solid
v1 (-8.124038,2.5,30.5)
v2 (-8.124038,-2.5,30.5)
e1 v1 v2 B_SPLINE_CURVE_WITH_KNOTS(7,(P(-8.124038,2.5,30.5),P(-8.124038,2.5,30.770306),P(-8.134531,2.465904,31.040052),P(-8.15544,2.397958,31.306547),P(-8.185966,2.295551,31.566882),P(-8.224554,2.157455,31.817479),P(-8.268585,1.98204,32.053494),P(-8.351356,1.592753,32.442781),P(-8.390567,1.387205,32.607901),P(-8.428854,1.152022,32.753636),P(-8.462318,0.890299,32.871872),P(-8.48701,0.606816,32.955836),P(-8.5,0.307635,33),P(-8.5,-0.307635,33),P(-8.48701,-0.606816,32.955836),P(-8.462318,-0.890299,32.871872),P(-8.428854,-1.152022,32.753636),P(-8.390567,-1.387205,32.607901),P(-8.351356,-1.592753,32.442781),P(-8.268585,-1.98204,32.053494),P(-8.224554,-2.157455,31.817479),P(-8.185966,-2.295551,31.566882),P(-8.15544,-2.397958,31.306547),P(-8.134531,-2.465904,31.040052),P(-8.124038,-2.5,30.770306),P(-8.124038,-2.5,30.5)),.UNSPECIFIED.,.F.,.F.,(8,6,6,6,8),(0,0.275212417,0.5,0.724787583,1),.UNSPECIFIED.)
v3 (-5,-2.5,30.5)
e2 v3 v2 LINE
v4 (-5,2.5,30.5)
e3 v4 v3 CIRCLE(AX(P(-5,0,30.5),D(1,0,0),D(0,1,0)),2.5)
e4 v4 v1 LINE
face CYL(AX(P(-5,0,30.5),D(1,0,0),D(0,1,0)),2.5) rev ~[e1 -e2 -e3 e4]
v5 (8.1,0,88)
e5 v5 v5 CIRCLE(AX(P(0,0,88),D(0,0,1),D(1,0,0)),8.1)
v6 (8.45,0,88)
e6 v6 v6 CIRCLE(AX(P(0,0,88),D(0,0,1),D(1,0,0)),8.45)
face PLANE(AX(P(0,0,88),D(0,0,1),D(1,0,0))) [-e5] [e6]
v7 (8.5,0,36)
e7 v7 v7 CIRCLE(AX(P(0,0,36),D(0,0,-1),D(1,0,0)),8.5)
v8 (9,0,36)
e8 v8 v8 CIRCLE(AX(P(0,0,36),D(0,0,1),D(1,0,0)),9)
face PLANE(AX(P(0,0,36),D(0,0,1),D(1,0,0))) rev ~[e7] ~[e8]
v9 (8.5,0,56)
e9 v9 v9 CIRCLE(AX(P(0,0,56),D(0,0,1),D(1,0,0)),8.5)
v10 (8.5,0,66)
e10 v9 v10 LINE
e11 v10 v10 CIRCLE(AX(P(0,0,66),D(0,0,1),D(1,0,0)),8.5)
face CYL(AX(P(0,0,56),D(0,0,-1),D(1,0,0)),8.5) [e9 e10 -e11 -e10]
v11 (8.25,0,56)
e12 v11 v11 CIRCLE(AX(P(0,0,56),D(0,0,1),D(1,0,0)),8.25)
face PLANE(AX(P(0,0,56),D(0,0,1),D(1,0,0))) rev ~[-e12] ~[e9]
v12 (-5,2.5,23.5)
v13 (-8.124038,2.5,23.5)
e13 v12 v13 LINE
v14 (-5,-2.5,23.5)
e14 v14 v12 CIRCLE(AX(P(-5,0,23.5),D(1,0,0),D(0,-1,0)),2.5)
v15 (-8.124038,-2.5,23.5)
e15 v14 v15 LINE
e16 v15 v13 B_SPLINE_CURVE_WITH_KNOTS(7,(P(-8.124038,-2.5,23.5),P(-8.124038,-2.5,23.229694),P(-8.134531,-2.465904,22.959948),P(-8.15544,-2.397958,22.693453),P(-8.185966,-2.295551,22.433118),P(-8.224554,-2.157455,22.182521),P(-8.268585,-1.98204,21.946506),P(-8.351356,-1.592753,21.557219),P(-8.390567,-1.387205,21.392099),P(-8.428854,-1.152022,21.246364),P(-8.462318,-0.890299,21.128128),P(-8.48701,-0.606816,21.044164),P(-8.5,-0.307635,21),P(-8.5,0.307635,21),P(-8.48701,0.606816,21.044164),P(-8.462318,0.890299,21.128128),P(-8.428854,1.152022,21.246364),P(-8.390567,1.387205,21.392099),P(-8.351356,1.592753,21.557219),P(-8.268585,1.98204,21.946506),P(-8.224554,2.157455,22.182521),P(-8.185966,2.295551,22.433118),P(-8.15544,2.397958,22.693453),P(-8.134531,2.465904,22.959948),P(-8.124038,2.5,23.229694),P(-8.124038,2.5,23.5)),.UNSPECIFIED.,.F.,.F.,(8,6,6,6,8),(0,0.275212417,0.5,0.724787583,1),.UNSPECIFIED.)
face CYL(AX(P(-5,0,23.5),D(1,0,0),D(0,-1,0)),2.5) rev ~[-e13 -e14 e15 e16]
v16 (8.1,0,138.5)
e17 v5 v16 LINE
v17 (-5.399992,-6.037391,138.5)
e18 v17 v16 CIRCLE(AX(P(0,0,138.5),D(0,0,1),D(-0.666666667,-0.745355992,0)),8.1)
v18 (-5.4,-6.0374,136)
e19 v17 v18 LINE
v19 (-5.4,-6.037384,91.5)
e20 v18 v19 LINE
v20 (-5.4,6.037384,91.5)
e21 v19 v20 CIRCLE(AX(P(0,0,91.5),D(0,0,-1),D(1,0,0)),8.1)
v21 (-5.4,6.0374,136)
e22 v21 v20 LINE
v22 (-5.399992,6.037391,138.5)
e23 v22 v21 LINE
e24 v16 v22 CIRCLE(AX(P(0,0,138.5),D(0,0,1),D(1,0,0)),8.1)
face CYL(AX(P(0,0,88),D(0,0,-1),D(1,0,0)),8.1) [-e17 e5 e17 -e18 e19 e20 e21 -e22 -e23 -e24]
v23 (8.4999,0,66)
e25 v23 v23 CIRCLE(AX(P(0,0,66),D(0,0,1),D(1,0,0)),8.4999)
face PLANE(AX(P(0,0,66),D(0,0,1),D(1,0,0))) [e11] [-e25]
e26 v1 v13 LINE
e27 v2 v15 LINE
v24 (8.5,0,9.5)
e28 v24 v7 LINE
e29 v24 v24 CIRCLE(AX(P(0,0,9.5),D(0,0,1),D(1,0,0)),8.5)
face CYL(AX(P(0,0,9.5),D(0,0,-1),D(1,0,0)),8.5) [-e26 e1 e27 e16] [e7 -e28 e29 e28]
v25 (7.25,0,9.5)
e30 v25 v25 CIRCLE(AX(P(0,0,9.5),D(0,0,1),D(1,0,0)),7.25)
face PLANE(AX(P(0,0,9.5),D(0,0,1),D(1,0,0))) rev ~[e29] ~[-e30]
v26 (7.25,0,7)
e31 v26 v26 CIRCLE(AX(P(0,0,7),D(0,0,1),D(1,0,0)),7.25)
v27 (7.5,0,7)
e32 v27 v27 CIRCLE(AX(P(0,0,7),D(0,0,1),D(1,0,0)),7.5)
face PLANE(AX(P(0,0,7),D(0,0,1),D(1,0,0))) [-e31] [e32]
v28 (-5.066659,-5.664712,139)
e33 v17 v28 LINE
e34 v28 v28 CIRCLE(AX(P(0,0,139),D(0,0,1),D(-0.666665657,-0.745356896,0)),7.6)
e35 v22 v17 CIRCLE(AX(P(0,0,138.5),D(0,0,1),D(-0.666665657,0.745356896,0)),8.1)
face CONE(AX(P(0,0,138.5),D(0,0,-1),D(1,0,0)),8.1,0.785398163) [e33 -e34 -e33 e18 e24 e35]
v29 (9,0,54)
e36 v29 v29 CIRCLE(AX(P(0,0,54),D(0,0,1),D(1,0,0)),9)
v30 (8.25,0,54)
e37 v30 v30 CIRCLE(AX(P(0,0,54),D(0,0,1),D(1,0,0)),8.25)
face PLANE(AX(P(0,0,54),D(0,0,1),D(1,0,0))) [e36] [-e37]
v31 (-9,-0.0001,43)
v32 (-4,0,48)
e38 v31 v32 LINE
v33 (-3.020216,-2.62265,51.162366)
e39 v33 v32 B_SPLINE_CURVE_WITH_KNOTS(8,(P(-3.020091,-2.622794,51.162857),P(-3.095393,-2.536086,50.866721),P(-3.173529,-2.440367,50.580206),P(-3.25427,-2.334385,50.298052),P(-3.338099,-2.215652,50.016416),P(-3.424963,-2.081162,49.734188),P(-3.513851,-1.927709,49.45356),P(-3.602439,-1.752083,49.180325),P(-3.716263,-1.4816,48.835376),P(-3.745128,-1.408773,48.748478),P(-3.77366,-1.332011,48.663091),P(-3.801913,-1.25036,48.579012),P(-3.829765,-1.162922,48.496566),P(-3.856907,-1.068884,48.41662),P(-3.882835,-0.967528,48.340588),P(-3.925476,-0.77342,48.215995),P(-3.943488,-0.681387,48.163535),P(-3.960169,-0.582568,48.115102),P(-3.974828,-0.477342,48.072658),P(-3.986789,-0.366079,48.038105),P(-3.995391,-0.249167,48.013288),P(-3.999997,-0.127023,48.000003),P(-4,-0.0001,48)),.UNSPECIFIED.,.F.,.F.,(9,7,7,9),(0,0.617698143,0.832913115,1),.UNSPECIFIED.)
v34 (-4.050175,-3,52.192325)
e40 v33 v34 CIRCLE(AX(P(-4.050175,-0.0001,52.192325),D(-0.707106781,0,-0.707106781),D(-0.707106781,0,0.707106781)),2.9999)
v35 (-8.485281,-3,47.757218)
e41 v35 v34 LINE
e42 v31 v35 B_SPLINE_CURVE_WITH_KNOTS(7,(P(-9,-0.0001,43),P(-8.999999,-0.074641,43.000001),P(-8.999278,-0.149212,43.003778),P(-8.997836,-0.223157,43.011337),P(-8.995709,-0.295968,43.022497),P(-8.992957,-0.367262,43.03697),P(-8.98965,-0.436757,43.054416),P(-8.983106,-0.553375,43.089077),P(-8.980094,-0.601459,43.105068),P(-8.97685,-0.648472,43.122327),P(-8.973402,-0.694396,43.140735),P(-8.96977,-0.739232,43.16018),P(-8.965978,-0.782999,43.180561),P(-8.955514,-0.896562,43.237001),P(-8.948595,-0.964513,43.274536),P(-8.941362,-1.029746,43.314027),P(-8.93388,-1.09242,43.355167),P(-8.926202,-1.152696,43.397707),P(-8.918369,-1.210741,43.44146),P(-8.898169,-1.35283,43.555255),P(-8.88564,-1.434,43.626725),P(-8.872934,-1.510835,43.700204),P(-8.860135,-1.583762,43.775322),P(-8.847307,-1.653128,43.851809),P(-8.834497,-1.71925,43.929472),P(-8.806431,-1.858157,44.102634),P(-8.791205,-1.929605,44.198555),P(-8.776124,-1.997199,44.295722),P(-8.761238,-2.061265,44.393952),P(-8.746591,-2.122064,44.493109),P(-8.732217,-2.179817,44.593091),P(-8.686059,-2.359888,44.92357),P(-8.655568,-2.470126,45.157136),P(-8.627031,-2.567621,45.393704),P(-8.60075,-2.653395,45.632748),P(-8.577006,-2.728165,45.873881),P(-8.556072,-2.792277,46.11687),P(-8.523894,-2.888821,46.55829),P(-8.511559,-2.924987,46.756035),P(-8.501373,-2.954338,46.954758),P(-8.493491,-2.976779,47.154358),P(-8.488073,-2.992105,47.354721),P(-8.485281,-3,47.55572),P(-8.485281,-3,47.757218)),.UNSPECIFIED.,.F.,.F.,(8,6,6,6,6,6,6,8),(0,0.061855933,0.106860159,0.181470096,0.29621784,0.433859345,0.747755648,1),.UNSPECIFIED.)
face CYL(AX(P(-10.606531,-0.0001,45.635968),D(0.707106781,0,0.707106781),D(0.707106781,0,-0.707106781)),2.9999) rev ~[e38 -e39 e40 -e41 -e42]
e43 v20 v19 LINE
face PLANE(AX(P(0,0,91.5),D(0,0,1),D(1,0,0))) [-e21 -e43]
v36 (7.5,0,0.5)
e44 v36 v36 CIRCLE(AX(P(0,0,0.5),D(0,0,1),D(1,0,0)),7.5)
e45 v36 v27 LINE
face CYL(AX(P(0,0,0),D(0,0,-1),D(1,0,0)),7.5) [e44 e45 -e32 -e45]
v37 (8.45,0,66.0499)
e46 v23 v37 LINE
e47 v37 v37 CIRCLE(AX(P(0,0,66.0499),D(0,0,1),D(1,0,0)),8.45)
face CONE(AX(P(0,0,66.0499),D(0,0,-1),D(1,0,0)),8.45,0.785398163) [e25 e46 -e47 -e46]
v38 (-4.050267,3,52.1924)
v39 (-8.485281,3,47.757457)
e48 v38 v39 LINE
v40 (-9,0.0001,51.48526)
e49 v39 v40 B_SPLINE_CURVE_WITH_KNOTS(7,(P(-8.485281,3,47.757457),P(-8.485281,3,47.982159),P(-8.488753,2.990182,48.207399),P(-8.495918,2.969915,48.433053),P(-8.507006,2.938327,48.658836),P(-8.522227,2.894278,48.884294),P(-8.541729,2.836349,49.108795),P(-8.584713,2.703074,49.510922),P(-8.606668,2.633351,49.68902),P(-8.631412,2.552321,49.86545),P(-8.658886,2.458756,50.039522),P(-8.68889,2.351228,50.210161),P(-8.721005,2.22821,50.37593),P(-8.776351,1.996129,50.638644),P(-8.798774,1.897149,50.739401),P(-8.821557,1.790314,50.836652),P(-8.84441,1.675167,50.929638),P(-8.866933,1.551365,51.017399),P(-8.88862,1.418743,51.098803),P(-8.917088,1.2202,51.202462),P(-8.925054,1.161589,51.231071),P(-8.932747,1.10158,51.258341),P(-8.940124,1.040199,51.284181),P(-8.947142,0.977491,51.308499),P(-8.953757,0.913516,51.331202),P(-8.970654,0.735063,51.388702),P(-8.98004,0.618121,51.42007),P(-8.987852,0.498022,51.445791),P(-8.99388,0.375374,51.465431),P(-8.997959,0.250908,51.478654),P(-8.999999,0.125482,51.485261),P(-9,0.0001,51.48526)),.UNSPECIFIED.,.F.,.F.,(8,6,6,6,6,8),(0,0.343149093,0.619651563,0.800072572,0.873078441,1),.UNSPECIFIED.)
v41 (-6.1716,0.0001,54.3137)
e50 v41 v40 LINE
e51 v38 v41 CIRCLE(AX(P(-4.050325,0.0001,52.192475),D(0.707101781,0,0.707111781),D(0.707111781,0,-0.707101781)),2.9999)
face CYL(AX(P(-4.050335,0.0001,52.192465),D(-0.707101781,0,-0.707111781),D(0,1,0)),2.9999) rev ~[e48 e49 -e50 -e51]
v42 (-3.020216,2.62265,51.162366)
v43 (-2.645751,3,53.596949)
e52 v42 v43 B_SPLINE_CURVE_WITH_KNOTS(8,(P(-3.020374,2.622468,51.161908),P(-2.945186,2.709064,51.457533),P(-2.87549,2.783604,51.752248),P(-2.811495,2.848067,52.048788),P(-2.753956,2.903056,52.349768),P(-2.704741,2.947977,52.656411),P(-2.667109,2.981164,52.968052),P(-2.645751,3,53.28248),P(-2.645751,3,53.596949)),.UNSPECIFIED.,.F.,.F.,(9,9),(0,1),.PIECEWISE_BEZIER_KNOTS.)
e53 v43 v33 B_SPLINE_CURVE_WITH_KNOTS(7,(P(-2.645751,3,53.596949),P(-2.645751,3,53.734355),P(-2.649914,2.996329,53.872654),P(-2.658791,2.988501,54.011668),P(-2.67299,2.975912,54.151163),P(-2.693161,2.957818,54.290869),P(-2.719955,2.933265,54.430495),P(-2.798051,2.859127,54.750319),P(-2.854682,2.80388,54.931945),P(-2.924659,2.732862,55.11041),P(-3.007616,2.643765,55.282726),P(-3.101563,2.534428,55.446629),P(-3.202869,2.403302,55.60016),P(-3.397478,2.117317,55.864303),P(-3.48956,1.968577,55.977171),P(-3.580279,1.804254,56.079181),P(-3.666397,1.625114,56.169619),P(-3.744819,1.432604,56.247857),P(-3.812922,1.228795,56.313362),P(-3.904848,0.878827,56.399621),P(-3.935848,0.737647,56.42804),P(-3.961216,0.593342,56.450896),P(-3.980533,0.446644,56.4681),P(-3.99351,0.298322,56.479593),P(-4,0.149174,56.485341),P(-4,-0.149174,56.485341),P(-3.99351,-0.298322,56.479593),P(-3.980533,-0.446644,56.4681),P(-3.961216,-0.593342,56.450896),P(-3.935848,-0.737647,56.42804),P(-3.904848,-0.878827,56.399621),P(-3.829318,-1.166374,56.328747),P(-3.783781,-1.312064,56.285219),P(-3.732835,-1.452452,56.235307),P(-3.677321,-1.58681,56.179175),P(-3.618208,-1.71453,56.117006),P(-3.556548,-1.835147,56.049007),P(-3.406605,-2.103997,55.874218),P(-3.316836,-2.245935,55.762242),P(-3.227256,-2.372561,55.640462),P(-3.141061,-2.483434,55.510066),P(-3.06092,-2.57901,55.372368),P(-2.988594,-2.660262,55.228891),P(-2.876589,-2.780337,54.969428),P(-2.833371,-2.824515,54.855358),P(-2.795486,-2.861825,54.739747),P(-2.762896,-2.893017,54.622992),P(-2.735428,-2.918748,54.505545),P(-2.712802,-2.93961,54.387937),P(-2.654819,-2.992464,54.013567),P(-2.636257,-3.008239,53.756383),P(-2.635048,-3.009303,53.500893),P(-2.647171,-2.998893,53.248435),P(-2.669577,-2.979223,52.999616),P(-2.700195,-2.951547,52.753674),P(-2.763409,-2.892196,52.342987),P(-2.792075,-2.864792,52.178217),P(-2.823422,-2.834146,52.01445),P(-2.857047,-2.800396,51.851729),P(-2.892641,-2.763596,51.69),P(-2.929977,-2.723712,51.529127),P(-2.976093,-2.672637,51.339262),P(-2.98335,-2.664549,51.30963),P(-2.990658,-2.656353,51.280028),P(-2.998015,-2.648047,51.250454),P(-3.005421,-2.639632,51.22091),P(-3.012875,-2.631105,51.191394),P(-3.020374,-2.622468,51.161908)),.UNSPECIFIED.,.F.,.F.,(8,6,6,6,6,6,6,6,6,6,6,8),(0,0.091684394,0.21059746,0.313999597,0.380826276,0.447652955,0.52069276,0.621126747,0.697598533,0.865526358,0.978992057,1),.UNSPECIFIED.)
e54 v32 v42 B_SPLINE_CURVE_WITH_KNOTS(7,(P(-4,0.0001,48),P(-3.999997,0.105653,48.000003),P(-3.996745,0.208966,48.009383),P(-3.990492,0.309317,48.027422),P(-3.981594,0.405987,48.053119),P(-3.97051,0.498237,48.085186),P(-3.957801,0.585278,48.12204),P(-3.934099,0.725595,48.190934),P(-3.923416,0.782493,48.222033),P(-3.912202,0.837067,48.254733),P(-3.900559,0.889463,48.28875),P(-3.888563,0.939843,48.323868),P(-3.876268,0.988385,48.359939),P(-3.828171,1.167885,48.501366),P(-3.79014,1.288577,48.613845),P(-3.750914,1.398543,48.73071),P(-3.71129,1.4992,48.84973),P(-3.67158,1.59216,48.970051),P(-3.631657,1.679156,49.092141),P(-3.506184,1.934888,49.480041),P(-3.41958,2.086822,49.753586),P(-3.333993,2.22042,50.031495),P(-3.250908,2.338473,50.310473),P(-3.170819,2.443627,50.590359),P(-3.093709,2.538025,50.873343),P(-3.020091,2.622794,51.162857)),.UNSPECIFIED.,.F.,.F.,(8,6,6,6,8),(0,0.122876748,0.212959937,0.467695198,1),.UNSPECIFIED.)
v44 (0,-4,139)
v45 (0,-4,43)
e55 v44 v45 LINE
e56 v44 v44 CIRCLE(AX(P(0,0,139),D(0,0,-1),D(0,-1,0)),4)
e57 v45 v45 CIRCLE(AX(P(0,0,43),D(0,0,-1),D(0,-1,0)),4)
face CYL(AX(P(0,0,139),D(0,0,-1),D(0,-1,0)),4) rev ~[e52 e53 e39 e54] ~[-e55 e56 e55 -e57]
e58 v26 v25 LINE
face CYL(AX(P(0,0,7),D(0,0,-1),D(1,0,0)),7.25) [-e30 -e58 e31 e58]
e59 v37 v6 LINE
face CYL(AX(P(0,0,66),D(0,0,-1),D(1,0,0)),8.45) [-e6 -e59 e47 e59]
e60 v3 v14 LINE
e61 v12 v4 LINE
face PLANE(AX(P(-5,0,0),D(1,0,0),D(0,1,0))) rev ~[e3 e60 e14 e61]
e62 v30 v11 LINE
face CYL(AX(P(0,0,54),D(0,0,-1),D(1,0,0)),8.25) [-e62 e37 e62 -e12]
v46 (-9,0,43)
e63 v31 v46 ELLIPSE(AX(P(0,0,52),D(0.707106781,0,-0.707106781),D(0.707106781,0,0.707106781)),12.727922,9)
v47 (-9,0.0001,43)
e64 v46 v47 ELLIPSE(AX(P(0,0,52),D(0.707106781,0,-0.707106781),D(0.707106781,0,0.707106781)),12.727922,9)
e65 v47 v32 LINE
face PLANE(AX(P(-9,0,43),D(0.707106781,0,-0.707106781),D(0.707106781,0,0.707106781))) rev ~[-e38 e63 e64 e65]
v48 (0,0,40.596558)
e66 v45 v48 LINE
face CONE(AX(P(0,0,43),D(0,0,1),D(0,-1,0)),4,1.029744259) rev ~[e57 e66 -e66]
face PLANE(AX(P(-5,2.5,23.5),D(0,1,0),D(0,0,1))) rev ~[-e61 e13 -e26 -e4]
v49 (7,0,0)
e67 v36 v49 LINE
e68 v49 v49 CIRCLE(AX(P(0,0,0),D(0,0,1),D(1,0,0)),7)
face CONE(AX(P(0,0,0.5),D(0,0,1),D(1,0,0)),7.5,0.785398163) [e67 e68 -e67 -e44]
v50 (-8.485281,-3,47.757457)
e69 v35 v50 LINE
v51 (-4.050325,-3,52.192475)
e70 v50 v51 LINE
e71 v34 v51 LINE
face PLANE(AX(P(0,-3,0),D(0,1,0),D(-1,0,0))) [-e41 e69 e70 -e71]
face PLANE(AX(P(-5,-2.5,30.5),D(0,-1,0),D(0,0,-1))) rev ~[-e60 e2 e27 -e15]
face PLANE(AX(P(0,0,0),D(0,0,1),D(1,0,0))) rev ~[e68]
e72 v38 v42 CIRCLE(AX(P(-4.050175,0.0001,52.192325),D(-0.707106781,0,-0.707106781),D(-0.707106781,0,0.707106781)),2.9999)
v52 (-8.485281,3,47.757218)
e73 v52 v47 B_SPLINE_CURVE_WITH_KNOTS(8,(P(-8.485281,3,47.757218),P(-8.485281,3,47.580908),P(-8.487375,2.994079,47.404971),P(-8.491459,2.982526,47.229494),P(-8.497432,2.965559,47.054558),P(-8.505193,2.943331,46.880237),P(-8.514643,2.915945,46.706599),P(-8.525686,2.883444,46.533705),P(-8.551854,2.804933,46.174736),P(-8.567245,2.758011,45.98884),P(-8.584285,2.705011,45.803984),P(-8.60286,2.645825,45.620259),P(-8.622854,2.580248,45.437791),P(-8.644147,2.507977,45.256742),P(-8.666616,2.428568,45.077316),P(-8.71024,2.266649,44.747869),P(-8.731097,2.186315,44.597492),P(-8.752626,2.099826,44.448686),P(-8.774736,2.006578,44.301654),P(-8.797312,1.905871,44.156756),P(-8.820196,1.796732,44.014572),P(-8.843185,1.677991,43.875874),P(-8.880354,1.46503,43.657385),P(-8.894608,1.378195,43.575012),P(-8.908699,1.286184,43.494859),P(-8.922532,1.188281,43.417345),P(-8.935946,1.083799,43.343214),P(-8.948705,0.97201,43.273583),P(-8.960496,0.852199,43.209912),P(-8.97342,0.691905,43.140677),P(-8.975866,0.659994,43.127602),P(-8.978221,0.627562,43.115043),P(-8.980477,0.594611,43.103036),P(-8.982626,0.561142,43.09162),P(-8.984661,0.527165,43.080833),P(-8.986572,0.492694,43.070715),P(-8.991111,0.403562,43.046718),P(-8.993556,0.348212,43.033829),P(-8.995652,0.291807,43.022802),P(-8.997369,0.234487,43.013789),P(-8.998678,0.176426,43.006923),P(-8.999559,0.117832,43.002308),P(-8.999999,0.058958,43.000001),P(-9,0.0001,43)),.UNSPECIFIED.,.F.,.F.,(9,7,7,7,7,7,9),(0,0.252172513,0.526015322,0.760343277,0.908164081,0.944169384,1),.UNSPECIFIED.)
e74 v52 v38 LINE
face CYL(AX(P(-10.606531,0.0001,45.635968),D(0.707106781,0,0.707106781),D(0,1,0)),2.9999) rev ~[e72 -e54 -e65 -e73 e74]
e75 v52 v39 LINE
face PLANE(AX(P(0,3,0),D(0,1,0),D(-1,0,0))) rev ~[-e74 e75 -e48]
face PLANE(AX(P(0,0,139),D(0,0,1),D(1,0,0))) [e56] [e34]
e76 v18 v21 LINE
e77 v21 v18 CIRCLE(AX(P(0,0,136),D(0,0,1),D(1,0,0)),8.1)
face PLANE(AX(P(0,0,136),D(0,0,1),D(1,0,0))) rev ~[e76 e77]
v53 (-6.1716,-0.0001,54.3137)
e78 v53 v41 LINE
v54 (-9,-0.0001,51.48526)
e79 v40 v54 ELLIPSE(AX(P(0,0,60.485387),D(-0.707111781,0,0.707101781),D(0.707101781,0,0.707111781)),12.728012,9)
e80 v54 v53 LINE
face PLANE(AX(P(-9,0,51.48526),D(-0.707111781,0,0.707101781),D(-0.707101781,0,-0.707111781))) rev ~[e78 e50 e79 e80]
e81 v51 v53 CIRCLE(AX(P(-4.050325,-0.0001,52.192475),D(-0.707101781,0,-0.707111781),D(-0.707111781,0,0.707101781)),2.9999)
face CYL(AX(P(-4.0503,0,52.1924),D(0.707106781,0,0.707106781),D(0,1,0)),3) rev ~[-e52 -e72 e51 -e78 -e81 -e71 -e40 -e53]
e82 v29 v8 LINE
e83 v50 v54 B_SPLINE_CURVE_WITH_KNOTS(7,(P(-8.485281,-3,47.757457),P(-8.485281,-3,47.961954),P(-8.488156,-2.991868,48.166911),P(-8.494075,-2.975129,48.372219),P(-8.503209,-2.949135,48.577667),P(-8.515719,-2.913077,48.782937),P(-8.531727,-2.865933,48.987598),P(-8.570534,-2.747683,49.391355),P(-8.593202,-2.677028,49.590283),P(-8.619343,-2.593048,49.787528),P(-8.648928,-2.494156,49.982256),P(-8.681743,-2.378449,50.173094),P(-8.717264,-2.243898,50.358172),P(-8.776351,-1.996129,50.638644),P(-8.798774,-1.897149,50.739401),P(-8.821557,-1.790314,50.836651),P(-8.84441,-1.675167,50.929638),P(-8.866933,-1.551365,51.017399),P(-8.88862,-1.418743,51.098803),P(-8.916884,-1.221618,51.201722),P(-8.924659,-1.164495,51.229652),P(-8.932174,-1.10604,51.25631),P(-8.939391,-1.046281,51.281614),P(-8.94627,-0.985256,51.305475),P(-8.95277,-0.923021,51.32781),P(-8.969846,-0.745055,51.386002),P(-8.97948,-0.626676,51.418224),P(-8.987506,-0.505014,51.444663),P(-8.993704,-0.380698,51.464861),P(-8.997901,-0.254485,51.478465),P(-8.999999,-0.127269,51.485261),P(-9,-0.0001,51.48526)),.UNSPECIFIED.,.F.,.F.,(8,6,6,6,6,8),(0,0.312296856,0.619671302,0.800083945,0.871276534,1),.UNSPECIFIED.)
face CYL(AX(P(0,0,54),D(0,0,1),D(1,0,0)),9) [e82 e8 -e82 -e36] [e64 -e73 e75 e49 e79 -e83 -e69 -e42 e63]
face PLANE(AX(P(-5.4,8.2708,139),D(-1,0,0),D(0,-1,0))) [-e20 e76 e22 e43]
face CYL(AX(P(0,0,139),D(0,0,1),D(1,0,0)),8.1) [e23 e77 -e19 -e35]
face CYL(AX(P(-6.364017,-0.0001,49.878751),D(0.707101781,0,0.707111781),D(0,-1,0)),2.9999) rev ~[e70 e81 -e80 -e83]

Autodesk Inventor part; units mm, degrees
ref_plane "XZ Plane" through (0, 0, 0) normal (0, 1, 0) x (-1, 0, 0)
ref_plane "XY Plane" through (0, 0, 0) normal (0, 0, 1) x (1, 0, 0)
sketch "Sketch1" plane through (0, 0, 0) normal (0, 0, 1) x (1, 0, 0)
  circle A0 centre (0, 0) radius 7.5
  dimension "d0" = 15
extrude "Extrusion1" add sketch "Sketch1" along normal blind 7
sketch "Sketch2" plane through (0, 0, 7) normal (0, 0, 1) x (1, 0, 0)
  circle A0 centre (0, 0) radius 7.25
  dimension "d3" = 14.5
extrude "Extrusion2" add sketch "Sketch2" along normal blind 2.5
sketch "Sketch3" plane through (0, 0, 9.5) normal (0, 0, 1) x (1, 0, 0)
  circle A0 centre (0, 0) radius 8.5
  dimension "d6" = 17
extrude "Extrusion3" add sketch "Sketch3" along normal blind 44.5
sketch "Sketch4" plane through (0, 0, 54) normal (0, 0, 1) x (1, 0, 0)
  circle A0 centre (0, 0) radius 8.25
  dimension "d9" = 16.5
extrude "Extrusion4" add sketch "Sketch4" along normal blind 2
sketch "Sketch5" plane through (0, 0, 56) normal (0, 0, 1) x (1, 0, 0)
  circle A0 centre (0, 0) radius 8.5
  dimension "d12" = 17
extrude "Extrusion5" add sketch "Sketch5" along normal blind 10
sketch "Sketch6" plane through (0, 0, 66) normal (0, 0, 1) x (1, 0, 0)
  circle A0 centre (0, 0) radius 8.45
  dimension "d15" = 16.9
extrude "Extrusion6" add sketch "Sketch6" along normal blind 22
sketch "Sketch7" plane through (0, 0, 88) normal (0, 0, 1) x (1, 0, 0)
  circle A0 centre (0, 0) radius 8.1
  dimension "d18" = 16.2
extrude "Extrusion7" add sketch "Sketch7" along normal blind 51
sketch "Sketch8" plane through (0, 0, 139) normal (0, 0, 1) x (1, 0, 0)
  line L0 (-5.4, 8.2708) -> (-5.4, -12.4422)
  line L1 (-5.4, -12.4422) -> (-13.0378, -12.4422)
  line L2 (-13.0378, -12.4422) -> (-13.0378, 8.2708)
  line L3 (-13.0378, 8.2708) -> (-5.4, 8.2708)
  point P0 (0, 0)
  dimension "d63" = 5.4
extrude "Extrusion8" cut sketch "Sketch8" against normal blind 47.5
sketch "Sketch9" plane through (0, 0, 139) normal (0, 0, 1) x (1, 0, 0)
  arc A0 (-5.4, -6.0374) -> (-5.4, 6.0374) centre (0, 0) ccw projected
  circle A1 centre (0, 0) radius 8.1
  point P0 (-6.0374, 5.4)
  point P1 (6.0374, 5.4)
  point P2 (6.0374, 5.4)
  point P3 (-6.0374, 5.4)
extrude "Extrusion9" add sketch "Sketch9" against normal blind 3
sketch "Sketch10" plane through (0, 0, 54) normal (0, 0, 1) x (1, 0, 0)
  circle A0 centre (0, 0) radius 9
  dimension "d26" = 18
extrude "Extrusion10" add sketch "Sketch10" against normal blind 18
chamfer "Chamfer1" distance 0.05 angle 45 1 edges at (-8.45, 0, 66)
ref_plane "Work Plane1" through (-5, 0, 0) normal (1, 0, 0) x (0, 1, 0)
sketch "Sketch11" plane through (-5, 0, 0) normal (1, 0, 0) x (0, 1, 0)
  line L0 (0, 23.5) -> (0, 30.5) construction
  line L1 (2.5, 23.5) -> (2.5, 30.5)
  line L2 (-2.5, 30.5) -> (-2.5, 23.5)
  arc A0 (-2.5, 23.5) -> (2.5, 23.5) centre (0, 23.5) ccw
  arc A1 (2.5, 30.5) -> (-2.5, 30.5) centre (0, 30.5) ccw
  line L3 (7.5, 0) -> (-7.5, 0) projected
  point P0 (0, 0)
  point P1 (0, 27)
  dimension "d33" = 7
  dimension "d34" = 5
  dimension "d35" = 0
  dimension "d36" = 23.5
extrude "Extrusion11" cut sketch "Sketch11" against normal blind 22
chamfer "Chamfer2" distance 0.5 angle 45 2 edges at (-7.5, 0, 0) (-8.1, 0, 139)
sketch "Sketch12" plane through (0, 0, 0) normal (0, 1, 0) x (-1, 0, 0)
  line L0 (9, 54) -> (9, 36) projected
  line L1 (9, 43) -> (1.9289, 50.0711)
  line L2 (1.9289, 50.0711) -> (6.1716, 54.3137)
  line L3 (6.1716, 54.3137) -> (13.2426, 47.2426)
  line L4 (13.2426, 47.2426) -> (9, 43)
  line L5 (9, 43) -> (19, 43) construction
  line L6 (-9, 36) -> (9, 36) projected
  point P0 (0, 0)
  dimension "d42" = 10
  dimension "d43" = 135
  dimension "d44" = 6
  dimension "d47" = 7
extrude "Extrusion12" cut sketch "Sketch12" along normal mid plane 6
fillet "Fillet1" radius 3 4 edges at (-7.3284, -3, 53.1569) (-5.2071, 3, 46.7929) (-5.2071, -3, 46.7929) (-7.3284, 3, 53.1569)
sketch "Sketch13" plane through (0, 0, 139) normal (0, 0, 1) x (1, 0, 0)
  circle A0 centre (0, 0) radius 8.1 projected
hole "Hole1" at (0, 0, 139) direction (0, 0, -1) diameter 8 depth 96 tip angle 118
sketch "Sketch14" plane through (-4.0503, 0, 52.1924) normal (-0.7071068, 0, -0.7071068) x (-0.7071068, 0, 0.7071068)
  arc A0 (-1.4567, -2.6226) -> (-1.4567, 2.6226) centre (0, 0) ccw projected
  point P0 (-39.7696, 0)
hole "Hole2" at (-4.0503, 0, 52.1924) direction (0.7071068, 0, 0.7071068) diameter 6 depth 4.75 tip angle 118
properties part number "shaft"
